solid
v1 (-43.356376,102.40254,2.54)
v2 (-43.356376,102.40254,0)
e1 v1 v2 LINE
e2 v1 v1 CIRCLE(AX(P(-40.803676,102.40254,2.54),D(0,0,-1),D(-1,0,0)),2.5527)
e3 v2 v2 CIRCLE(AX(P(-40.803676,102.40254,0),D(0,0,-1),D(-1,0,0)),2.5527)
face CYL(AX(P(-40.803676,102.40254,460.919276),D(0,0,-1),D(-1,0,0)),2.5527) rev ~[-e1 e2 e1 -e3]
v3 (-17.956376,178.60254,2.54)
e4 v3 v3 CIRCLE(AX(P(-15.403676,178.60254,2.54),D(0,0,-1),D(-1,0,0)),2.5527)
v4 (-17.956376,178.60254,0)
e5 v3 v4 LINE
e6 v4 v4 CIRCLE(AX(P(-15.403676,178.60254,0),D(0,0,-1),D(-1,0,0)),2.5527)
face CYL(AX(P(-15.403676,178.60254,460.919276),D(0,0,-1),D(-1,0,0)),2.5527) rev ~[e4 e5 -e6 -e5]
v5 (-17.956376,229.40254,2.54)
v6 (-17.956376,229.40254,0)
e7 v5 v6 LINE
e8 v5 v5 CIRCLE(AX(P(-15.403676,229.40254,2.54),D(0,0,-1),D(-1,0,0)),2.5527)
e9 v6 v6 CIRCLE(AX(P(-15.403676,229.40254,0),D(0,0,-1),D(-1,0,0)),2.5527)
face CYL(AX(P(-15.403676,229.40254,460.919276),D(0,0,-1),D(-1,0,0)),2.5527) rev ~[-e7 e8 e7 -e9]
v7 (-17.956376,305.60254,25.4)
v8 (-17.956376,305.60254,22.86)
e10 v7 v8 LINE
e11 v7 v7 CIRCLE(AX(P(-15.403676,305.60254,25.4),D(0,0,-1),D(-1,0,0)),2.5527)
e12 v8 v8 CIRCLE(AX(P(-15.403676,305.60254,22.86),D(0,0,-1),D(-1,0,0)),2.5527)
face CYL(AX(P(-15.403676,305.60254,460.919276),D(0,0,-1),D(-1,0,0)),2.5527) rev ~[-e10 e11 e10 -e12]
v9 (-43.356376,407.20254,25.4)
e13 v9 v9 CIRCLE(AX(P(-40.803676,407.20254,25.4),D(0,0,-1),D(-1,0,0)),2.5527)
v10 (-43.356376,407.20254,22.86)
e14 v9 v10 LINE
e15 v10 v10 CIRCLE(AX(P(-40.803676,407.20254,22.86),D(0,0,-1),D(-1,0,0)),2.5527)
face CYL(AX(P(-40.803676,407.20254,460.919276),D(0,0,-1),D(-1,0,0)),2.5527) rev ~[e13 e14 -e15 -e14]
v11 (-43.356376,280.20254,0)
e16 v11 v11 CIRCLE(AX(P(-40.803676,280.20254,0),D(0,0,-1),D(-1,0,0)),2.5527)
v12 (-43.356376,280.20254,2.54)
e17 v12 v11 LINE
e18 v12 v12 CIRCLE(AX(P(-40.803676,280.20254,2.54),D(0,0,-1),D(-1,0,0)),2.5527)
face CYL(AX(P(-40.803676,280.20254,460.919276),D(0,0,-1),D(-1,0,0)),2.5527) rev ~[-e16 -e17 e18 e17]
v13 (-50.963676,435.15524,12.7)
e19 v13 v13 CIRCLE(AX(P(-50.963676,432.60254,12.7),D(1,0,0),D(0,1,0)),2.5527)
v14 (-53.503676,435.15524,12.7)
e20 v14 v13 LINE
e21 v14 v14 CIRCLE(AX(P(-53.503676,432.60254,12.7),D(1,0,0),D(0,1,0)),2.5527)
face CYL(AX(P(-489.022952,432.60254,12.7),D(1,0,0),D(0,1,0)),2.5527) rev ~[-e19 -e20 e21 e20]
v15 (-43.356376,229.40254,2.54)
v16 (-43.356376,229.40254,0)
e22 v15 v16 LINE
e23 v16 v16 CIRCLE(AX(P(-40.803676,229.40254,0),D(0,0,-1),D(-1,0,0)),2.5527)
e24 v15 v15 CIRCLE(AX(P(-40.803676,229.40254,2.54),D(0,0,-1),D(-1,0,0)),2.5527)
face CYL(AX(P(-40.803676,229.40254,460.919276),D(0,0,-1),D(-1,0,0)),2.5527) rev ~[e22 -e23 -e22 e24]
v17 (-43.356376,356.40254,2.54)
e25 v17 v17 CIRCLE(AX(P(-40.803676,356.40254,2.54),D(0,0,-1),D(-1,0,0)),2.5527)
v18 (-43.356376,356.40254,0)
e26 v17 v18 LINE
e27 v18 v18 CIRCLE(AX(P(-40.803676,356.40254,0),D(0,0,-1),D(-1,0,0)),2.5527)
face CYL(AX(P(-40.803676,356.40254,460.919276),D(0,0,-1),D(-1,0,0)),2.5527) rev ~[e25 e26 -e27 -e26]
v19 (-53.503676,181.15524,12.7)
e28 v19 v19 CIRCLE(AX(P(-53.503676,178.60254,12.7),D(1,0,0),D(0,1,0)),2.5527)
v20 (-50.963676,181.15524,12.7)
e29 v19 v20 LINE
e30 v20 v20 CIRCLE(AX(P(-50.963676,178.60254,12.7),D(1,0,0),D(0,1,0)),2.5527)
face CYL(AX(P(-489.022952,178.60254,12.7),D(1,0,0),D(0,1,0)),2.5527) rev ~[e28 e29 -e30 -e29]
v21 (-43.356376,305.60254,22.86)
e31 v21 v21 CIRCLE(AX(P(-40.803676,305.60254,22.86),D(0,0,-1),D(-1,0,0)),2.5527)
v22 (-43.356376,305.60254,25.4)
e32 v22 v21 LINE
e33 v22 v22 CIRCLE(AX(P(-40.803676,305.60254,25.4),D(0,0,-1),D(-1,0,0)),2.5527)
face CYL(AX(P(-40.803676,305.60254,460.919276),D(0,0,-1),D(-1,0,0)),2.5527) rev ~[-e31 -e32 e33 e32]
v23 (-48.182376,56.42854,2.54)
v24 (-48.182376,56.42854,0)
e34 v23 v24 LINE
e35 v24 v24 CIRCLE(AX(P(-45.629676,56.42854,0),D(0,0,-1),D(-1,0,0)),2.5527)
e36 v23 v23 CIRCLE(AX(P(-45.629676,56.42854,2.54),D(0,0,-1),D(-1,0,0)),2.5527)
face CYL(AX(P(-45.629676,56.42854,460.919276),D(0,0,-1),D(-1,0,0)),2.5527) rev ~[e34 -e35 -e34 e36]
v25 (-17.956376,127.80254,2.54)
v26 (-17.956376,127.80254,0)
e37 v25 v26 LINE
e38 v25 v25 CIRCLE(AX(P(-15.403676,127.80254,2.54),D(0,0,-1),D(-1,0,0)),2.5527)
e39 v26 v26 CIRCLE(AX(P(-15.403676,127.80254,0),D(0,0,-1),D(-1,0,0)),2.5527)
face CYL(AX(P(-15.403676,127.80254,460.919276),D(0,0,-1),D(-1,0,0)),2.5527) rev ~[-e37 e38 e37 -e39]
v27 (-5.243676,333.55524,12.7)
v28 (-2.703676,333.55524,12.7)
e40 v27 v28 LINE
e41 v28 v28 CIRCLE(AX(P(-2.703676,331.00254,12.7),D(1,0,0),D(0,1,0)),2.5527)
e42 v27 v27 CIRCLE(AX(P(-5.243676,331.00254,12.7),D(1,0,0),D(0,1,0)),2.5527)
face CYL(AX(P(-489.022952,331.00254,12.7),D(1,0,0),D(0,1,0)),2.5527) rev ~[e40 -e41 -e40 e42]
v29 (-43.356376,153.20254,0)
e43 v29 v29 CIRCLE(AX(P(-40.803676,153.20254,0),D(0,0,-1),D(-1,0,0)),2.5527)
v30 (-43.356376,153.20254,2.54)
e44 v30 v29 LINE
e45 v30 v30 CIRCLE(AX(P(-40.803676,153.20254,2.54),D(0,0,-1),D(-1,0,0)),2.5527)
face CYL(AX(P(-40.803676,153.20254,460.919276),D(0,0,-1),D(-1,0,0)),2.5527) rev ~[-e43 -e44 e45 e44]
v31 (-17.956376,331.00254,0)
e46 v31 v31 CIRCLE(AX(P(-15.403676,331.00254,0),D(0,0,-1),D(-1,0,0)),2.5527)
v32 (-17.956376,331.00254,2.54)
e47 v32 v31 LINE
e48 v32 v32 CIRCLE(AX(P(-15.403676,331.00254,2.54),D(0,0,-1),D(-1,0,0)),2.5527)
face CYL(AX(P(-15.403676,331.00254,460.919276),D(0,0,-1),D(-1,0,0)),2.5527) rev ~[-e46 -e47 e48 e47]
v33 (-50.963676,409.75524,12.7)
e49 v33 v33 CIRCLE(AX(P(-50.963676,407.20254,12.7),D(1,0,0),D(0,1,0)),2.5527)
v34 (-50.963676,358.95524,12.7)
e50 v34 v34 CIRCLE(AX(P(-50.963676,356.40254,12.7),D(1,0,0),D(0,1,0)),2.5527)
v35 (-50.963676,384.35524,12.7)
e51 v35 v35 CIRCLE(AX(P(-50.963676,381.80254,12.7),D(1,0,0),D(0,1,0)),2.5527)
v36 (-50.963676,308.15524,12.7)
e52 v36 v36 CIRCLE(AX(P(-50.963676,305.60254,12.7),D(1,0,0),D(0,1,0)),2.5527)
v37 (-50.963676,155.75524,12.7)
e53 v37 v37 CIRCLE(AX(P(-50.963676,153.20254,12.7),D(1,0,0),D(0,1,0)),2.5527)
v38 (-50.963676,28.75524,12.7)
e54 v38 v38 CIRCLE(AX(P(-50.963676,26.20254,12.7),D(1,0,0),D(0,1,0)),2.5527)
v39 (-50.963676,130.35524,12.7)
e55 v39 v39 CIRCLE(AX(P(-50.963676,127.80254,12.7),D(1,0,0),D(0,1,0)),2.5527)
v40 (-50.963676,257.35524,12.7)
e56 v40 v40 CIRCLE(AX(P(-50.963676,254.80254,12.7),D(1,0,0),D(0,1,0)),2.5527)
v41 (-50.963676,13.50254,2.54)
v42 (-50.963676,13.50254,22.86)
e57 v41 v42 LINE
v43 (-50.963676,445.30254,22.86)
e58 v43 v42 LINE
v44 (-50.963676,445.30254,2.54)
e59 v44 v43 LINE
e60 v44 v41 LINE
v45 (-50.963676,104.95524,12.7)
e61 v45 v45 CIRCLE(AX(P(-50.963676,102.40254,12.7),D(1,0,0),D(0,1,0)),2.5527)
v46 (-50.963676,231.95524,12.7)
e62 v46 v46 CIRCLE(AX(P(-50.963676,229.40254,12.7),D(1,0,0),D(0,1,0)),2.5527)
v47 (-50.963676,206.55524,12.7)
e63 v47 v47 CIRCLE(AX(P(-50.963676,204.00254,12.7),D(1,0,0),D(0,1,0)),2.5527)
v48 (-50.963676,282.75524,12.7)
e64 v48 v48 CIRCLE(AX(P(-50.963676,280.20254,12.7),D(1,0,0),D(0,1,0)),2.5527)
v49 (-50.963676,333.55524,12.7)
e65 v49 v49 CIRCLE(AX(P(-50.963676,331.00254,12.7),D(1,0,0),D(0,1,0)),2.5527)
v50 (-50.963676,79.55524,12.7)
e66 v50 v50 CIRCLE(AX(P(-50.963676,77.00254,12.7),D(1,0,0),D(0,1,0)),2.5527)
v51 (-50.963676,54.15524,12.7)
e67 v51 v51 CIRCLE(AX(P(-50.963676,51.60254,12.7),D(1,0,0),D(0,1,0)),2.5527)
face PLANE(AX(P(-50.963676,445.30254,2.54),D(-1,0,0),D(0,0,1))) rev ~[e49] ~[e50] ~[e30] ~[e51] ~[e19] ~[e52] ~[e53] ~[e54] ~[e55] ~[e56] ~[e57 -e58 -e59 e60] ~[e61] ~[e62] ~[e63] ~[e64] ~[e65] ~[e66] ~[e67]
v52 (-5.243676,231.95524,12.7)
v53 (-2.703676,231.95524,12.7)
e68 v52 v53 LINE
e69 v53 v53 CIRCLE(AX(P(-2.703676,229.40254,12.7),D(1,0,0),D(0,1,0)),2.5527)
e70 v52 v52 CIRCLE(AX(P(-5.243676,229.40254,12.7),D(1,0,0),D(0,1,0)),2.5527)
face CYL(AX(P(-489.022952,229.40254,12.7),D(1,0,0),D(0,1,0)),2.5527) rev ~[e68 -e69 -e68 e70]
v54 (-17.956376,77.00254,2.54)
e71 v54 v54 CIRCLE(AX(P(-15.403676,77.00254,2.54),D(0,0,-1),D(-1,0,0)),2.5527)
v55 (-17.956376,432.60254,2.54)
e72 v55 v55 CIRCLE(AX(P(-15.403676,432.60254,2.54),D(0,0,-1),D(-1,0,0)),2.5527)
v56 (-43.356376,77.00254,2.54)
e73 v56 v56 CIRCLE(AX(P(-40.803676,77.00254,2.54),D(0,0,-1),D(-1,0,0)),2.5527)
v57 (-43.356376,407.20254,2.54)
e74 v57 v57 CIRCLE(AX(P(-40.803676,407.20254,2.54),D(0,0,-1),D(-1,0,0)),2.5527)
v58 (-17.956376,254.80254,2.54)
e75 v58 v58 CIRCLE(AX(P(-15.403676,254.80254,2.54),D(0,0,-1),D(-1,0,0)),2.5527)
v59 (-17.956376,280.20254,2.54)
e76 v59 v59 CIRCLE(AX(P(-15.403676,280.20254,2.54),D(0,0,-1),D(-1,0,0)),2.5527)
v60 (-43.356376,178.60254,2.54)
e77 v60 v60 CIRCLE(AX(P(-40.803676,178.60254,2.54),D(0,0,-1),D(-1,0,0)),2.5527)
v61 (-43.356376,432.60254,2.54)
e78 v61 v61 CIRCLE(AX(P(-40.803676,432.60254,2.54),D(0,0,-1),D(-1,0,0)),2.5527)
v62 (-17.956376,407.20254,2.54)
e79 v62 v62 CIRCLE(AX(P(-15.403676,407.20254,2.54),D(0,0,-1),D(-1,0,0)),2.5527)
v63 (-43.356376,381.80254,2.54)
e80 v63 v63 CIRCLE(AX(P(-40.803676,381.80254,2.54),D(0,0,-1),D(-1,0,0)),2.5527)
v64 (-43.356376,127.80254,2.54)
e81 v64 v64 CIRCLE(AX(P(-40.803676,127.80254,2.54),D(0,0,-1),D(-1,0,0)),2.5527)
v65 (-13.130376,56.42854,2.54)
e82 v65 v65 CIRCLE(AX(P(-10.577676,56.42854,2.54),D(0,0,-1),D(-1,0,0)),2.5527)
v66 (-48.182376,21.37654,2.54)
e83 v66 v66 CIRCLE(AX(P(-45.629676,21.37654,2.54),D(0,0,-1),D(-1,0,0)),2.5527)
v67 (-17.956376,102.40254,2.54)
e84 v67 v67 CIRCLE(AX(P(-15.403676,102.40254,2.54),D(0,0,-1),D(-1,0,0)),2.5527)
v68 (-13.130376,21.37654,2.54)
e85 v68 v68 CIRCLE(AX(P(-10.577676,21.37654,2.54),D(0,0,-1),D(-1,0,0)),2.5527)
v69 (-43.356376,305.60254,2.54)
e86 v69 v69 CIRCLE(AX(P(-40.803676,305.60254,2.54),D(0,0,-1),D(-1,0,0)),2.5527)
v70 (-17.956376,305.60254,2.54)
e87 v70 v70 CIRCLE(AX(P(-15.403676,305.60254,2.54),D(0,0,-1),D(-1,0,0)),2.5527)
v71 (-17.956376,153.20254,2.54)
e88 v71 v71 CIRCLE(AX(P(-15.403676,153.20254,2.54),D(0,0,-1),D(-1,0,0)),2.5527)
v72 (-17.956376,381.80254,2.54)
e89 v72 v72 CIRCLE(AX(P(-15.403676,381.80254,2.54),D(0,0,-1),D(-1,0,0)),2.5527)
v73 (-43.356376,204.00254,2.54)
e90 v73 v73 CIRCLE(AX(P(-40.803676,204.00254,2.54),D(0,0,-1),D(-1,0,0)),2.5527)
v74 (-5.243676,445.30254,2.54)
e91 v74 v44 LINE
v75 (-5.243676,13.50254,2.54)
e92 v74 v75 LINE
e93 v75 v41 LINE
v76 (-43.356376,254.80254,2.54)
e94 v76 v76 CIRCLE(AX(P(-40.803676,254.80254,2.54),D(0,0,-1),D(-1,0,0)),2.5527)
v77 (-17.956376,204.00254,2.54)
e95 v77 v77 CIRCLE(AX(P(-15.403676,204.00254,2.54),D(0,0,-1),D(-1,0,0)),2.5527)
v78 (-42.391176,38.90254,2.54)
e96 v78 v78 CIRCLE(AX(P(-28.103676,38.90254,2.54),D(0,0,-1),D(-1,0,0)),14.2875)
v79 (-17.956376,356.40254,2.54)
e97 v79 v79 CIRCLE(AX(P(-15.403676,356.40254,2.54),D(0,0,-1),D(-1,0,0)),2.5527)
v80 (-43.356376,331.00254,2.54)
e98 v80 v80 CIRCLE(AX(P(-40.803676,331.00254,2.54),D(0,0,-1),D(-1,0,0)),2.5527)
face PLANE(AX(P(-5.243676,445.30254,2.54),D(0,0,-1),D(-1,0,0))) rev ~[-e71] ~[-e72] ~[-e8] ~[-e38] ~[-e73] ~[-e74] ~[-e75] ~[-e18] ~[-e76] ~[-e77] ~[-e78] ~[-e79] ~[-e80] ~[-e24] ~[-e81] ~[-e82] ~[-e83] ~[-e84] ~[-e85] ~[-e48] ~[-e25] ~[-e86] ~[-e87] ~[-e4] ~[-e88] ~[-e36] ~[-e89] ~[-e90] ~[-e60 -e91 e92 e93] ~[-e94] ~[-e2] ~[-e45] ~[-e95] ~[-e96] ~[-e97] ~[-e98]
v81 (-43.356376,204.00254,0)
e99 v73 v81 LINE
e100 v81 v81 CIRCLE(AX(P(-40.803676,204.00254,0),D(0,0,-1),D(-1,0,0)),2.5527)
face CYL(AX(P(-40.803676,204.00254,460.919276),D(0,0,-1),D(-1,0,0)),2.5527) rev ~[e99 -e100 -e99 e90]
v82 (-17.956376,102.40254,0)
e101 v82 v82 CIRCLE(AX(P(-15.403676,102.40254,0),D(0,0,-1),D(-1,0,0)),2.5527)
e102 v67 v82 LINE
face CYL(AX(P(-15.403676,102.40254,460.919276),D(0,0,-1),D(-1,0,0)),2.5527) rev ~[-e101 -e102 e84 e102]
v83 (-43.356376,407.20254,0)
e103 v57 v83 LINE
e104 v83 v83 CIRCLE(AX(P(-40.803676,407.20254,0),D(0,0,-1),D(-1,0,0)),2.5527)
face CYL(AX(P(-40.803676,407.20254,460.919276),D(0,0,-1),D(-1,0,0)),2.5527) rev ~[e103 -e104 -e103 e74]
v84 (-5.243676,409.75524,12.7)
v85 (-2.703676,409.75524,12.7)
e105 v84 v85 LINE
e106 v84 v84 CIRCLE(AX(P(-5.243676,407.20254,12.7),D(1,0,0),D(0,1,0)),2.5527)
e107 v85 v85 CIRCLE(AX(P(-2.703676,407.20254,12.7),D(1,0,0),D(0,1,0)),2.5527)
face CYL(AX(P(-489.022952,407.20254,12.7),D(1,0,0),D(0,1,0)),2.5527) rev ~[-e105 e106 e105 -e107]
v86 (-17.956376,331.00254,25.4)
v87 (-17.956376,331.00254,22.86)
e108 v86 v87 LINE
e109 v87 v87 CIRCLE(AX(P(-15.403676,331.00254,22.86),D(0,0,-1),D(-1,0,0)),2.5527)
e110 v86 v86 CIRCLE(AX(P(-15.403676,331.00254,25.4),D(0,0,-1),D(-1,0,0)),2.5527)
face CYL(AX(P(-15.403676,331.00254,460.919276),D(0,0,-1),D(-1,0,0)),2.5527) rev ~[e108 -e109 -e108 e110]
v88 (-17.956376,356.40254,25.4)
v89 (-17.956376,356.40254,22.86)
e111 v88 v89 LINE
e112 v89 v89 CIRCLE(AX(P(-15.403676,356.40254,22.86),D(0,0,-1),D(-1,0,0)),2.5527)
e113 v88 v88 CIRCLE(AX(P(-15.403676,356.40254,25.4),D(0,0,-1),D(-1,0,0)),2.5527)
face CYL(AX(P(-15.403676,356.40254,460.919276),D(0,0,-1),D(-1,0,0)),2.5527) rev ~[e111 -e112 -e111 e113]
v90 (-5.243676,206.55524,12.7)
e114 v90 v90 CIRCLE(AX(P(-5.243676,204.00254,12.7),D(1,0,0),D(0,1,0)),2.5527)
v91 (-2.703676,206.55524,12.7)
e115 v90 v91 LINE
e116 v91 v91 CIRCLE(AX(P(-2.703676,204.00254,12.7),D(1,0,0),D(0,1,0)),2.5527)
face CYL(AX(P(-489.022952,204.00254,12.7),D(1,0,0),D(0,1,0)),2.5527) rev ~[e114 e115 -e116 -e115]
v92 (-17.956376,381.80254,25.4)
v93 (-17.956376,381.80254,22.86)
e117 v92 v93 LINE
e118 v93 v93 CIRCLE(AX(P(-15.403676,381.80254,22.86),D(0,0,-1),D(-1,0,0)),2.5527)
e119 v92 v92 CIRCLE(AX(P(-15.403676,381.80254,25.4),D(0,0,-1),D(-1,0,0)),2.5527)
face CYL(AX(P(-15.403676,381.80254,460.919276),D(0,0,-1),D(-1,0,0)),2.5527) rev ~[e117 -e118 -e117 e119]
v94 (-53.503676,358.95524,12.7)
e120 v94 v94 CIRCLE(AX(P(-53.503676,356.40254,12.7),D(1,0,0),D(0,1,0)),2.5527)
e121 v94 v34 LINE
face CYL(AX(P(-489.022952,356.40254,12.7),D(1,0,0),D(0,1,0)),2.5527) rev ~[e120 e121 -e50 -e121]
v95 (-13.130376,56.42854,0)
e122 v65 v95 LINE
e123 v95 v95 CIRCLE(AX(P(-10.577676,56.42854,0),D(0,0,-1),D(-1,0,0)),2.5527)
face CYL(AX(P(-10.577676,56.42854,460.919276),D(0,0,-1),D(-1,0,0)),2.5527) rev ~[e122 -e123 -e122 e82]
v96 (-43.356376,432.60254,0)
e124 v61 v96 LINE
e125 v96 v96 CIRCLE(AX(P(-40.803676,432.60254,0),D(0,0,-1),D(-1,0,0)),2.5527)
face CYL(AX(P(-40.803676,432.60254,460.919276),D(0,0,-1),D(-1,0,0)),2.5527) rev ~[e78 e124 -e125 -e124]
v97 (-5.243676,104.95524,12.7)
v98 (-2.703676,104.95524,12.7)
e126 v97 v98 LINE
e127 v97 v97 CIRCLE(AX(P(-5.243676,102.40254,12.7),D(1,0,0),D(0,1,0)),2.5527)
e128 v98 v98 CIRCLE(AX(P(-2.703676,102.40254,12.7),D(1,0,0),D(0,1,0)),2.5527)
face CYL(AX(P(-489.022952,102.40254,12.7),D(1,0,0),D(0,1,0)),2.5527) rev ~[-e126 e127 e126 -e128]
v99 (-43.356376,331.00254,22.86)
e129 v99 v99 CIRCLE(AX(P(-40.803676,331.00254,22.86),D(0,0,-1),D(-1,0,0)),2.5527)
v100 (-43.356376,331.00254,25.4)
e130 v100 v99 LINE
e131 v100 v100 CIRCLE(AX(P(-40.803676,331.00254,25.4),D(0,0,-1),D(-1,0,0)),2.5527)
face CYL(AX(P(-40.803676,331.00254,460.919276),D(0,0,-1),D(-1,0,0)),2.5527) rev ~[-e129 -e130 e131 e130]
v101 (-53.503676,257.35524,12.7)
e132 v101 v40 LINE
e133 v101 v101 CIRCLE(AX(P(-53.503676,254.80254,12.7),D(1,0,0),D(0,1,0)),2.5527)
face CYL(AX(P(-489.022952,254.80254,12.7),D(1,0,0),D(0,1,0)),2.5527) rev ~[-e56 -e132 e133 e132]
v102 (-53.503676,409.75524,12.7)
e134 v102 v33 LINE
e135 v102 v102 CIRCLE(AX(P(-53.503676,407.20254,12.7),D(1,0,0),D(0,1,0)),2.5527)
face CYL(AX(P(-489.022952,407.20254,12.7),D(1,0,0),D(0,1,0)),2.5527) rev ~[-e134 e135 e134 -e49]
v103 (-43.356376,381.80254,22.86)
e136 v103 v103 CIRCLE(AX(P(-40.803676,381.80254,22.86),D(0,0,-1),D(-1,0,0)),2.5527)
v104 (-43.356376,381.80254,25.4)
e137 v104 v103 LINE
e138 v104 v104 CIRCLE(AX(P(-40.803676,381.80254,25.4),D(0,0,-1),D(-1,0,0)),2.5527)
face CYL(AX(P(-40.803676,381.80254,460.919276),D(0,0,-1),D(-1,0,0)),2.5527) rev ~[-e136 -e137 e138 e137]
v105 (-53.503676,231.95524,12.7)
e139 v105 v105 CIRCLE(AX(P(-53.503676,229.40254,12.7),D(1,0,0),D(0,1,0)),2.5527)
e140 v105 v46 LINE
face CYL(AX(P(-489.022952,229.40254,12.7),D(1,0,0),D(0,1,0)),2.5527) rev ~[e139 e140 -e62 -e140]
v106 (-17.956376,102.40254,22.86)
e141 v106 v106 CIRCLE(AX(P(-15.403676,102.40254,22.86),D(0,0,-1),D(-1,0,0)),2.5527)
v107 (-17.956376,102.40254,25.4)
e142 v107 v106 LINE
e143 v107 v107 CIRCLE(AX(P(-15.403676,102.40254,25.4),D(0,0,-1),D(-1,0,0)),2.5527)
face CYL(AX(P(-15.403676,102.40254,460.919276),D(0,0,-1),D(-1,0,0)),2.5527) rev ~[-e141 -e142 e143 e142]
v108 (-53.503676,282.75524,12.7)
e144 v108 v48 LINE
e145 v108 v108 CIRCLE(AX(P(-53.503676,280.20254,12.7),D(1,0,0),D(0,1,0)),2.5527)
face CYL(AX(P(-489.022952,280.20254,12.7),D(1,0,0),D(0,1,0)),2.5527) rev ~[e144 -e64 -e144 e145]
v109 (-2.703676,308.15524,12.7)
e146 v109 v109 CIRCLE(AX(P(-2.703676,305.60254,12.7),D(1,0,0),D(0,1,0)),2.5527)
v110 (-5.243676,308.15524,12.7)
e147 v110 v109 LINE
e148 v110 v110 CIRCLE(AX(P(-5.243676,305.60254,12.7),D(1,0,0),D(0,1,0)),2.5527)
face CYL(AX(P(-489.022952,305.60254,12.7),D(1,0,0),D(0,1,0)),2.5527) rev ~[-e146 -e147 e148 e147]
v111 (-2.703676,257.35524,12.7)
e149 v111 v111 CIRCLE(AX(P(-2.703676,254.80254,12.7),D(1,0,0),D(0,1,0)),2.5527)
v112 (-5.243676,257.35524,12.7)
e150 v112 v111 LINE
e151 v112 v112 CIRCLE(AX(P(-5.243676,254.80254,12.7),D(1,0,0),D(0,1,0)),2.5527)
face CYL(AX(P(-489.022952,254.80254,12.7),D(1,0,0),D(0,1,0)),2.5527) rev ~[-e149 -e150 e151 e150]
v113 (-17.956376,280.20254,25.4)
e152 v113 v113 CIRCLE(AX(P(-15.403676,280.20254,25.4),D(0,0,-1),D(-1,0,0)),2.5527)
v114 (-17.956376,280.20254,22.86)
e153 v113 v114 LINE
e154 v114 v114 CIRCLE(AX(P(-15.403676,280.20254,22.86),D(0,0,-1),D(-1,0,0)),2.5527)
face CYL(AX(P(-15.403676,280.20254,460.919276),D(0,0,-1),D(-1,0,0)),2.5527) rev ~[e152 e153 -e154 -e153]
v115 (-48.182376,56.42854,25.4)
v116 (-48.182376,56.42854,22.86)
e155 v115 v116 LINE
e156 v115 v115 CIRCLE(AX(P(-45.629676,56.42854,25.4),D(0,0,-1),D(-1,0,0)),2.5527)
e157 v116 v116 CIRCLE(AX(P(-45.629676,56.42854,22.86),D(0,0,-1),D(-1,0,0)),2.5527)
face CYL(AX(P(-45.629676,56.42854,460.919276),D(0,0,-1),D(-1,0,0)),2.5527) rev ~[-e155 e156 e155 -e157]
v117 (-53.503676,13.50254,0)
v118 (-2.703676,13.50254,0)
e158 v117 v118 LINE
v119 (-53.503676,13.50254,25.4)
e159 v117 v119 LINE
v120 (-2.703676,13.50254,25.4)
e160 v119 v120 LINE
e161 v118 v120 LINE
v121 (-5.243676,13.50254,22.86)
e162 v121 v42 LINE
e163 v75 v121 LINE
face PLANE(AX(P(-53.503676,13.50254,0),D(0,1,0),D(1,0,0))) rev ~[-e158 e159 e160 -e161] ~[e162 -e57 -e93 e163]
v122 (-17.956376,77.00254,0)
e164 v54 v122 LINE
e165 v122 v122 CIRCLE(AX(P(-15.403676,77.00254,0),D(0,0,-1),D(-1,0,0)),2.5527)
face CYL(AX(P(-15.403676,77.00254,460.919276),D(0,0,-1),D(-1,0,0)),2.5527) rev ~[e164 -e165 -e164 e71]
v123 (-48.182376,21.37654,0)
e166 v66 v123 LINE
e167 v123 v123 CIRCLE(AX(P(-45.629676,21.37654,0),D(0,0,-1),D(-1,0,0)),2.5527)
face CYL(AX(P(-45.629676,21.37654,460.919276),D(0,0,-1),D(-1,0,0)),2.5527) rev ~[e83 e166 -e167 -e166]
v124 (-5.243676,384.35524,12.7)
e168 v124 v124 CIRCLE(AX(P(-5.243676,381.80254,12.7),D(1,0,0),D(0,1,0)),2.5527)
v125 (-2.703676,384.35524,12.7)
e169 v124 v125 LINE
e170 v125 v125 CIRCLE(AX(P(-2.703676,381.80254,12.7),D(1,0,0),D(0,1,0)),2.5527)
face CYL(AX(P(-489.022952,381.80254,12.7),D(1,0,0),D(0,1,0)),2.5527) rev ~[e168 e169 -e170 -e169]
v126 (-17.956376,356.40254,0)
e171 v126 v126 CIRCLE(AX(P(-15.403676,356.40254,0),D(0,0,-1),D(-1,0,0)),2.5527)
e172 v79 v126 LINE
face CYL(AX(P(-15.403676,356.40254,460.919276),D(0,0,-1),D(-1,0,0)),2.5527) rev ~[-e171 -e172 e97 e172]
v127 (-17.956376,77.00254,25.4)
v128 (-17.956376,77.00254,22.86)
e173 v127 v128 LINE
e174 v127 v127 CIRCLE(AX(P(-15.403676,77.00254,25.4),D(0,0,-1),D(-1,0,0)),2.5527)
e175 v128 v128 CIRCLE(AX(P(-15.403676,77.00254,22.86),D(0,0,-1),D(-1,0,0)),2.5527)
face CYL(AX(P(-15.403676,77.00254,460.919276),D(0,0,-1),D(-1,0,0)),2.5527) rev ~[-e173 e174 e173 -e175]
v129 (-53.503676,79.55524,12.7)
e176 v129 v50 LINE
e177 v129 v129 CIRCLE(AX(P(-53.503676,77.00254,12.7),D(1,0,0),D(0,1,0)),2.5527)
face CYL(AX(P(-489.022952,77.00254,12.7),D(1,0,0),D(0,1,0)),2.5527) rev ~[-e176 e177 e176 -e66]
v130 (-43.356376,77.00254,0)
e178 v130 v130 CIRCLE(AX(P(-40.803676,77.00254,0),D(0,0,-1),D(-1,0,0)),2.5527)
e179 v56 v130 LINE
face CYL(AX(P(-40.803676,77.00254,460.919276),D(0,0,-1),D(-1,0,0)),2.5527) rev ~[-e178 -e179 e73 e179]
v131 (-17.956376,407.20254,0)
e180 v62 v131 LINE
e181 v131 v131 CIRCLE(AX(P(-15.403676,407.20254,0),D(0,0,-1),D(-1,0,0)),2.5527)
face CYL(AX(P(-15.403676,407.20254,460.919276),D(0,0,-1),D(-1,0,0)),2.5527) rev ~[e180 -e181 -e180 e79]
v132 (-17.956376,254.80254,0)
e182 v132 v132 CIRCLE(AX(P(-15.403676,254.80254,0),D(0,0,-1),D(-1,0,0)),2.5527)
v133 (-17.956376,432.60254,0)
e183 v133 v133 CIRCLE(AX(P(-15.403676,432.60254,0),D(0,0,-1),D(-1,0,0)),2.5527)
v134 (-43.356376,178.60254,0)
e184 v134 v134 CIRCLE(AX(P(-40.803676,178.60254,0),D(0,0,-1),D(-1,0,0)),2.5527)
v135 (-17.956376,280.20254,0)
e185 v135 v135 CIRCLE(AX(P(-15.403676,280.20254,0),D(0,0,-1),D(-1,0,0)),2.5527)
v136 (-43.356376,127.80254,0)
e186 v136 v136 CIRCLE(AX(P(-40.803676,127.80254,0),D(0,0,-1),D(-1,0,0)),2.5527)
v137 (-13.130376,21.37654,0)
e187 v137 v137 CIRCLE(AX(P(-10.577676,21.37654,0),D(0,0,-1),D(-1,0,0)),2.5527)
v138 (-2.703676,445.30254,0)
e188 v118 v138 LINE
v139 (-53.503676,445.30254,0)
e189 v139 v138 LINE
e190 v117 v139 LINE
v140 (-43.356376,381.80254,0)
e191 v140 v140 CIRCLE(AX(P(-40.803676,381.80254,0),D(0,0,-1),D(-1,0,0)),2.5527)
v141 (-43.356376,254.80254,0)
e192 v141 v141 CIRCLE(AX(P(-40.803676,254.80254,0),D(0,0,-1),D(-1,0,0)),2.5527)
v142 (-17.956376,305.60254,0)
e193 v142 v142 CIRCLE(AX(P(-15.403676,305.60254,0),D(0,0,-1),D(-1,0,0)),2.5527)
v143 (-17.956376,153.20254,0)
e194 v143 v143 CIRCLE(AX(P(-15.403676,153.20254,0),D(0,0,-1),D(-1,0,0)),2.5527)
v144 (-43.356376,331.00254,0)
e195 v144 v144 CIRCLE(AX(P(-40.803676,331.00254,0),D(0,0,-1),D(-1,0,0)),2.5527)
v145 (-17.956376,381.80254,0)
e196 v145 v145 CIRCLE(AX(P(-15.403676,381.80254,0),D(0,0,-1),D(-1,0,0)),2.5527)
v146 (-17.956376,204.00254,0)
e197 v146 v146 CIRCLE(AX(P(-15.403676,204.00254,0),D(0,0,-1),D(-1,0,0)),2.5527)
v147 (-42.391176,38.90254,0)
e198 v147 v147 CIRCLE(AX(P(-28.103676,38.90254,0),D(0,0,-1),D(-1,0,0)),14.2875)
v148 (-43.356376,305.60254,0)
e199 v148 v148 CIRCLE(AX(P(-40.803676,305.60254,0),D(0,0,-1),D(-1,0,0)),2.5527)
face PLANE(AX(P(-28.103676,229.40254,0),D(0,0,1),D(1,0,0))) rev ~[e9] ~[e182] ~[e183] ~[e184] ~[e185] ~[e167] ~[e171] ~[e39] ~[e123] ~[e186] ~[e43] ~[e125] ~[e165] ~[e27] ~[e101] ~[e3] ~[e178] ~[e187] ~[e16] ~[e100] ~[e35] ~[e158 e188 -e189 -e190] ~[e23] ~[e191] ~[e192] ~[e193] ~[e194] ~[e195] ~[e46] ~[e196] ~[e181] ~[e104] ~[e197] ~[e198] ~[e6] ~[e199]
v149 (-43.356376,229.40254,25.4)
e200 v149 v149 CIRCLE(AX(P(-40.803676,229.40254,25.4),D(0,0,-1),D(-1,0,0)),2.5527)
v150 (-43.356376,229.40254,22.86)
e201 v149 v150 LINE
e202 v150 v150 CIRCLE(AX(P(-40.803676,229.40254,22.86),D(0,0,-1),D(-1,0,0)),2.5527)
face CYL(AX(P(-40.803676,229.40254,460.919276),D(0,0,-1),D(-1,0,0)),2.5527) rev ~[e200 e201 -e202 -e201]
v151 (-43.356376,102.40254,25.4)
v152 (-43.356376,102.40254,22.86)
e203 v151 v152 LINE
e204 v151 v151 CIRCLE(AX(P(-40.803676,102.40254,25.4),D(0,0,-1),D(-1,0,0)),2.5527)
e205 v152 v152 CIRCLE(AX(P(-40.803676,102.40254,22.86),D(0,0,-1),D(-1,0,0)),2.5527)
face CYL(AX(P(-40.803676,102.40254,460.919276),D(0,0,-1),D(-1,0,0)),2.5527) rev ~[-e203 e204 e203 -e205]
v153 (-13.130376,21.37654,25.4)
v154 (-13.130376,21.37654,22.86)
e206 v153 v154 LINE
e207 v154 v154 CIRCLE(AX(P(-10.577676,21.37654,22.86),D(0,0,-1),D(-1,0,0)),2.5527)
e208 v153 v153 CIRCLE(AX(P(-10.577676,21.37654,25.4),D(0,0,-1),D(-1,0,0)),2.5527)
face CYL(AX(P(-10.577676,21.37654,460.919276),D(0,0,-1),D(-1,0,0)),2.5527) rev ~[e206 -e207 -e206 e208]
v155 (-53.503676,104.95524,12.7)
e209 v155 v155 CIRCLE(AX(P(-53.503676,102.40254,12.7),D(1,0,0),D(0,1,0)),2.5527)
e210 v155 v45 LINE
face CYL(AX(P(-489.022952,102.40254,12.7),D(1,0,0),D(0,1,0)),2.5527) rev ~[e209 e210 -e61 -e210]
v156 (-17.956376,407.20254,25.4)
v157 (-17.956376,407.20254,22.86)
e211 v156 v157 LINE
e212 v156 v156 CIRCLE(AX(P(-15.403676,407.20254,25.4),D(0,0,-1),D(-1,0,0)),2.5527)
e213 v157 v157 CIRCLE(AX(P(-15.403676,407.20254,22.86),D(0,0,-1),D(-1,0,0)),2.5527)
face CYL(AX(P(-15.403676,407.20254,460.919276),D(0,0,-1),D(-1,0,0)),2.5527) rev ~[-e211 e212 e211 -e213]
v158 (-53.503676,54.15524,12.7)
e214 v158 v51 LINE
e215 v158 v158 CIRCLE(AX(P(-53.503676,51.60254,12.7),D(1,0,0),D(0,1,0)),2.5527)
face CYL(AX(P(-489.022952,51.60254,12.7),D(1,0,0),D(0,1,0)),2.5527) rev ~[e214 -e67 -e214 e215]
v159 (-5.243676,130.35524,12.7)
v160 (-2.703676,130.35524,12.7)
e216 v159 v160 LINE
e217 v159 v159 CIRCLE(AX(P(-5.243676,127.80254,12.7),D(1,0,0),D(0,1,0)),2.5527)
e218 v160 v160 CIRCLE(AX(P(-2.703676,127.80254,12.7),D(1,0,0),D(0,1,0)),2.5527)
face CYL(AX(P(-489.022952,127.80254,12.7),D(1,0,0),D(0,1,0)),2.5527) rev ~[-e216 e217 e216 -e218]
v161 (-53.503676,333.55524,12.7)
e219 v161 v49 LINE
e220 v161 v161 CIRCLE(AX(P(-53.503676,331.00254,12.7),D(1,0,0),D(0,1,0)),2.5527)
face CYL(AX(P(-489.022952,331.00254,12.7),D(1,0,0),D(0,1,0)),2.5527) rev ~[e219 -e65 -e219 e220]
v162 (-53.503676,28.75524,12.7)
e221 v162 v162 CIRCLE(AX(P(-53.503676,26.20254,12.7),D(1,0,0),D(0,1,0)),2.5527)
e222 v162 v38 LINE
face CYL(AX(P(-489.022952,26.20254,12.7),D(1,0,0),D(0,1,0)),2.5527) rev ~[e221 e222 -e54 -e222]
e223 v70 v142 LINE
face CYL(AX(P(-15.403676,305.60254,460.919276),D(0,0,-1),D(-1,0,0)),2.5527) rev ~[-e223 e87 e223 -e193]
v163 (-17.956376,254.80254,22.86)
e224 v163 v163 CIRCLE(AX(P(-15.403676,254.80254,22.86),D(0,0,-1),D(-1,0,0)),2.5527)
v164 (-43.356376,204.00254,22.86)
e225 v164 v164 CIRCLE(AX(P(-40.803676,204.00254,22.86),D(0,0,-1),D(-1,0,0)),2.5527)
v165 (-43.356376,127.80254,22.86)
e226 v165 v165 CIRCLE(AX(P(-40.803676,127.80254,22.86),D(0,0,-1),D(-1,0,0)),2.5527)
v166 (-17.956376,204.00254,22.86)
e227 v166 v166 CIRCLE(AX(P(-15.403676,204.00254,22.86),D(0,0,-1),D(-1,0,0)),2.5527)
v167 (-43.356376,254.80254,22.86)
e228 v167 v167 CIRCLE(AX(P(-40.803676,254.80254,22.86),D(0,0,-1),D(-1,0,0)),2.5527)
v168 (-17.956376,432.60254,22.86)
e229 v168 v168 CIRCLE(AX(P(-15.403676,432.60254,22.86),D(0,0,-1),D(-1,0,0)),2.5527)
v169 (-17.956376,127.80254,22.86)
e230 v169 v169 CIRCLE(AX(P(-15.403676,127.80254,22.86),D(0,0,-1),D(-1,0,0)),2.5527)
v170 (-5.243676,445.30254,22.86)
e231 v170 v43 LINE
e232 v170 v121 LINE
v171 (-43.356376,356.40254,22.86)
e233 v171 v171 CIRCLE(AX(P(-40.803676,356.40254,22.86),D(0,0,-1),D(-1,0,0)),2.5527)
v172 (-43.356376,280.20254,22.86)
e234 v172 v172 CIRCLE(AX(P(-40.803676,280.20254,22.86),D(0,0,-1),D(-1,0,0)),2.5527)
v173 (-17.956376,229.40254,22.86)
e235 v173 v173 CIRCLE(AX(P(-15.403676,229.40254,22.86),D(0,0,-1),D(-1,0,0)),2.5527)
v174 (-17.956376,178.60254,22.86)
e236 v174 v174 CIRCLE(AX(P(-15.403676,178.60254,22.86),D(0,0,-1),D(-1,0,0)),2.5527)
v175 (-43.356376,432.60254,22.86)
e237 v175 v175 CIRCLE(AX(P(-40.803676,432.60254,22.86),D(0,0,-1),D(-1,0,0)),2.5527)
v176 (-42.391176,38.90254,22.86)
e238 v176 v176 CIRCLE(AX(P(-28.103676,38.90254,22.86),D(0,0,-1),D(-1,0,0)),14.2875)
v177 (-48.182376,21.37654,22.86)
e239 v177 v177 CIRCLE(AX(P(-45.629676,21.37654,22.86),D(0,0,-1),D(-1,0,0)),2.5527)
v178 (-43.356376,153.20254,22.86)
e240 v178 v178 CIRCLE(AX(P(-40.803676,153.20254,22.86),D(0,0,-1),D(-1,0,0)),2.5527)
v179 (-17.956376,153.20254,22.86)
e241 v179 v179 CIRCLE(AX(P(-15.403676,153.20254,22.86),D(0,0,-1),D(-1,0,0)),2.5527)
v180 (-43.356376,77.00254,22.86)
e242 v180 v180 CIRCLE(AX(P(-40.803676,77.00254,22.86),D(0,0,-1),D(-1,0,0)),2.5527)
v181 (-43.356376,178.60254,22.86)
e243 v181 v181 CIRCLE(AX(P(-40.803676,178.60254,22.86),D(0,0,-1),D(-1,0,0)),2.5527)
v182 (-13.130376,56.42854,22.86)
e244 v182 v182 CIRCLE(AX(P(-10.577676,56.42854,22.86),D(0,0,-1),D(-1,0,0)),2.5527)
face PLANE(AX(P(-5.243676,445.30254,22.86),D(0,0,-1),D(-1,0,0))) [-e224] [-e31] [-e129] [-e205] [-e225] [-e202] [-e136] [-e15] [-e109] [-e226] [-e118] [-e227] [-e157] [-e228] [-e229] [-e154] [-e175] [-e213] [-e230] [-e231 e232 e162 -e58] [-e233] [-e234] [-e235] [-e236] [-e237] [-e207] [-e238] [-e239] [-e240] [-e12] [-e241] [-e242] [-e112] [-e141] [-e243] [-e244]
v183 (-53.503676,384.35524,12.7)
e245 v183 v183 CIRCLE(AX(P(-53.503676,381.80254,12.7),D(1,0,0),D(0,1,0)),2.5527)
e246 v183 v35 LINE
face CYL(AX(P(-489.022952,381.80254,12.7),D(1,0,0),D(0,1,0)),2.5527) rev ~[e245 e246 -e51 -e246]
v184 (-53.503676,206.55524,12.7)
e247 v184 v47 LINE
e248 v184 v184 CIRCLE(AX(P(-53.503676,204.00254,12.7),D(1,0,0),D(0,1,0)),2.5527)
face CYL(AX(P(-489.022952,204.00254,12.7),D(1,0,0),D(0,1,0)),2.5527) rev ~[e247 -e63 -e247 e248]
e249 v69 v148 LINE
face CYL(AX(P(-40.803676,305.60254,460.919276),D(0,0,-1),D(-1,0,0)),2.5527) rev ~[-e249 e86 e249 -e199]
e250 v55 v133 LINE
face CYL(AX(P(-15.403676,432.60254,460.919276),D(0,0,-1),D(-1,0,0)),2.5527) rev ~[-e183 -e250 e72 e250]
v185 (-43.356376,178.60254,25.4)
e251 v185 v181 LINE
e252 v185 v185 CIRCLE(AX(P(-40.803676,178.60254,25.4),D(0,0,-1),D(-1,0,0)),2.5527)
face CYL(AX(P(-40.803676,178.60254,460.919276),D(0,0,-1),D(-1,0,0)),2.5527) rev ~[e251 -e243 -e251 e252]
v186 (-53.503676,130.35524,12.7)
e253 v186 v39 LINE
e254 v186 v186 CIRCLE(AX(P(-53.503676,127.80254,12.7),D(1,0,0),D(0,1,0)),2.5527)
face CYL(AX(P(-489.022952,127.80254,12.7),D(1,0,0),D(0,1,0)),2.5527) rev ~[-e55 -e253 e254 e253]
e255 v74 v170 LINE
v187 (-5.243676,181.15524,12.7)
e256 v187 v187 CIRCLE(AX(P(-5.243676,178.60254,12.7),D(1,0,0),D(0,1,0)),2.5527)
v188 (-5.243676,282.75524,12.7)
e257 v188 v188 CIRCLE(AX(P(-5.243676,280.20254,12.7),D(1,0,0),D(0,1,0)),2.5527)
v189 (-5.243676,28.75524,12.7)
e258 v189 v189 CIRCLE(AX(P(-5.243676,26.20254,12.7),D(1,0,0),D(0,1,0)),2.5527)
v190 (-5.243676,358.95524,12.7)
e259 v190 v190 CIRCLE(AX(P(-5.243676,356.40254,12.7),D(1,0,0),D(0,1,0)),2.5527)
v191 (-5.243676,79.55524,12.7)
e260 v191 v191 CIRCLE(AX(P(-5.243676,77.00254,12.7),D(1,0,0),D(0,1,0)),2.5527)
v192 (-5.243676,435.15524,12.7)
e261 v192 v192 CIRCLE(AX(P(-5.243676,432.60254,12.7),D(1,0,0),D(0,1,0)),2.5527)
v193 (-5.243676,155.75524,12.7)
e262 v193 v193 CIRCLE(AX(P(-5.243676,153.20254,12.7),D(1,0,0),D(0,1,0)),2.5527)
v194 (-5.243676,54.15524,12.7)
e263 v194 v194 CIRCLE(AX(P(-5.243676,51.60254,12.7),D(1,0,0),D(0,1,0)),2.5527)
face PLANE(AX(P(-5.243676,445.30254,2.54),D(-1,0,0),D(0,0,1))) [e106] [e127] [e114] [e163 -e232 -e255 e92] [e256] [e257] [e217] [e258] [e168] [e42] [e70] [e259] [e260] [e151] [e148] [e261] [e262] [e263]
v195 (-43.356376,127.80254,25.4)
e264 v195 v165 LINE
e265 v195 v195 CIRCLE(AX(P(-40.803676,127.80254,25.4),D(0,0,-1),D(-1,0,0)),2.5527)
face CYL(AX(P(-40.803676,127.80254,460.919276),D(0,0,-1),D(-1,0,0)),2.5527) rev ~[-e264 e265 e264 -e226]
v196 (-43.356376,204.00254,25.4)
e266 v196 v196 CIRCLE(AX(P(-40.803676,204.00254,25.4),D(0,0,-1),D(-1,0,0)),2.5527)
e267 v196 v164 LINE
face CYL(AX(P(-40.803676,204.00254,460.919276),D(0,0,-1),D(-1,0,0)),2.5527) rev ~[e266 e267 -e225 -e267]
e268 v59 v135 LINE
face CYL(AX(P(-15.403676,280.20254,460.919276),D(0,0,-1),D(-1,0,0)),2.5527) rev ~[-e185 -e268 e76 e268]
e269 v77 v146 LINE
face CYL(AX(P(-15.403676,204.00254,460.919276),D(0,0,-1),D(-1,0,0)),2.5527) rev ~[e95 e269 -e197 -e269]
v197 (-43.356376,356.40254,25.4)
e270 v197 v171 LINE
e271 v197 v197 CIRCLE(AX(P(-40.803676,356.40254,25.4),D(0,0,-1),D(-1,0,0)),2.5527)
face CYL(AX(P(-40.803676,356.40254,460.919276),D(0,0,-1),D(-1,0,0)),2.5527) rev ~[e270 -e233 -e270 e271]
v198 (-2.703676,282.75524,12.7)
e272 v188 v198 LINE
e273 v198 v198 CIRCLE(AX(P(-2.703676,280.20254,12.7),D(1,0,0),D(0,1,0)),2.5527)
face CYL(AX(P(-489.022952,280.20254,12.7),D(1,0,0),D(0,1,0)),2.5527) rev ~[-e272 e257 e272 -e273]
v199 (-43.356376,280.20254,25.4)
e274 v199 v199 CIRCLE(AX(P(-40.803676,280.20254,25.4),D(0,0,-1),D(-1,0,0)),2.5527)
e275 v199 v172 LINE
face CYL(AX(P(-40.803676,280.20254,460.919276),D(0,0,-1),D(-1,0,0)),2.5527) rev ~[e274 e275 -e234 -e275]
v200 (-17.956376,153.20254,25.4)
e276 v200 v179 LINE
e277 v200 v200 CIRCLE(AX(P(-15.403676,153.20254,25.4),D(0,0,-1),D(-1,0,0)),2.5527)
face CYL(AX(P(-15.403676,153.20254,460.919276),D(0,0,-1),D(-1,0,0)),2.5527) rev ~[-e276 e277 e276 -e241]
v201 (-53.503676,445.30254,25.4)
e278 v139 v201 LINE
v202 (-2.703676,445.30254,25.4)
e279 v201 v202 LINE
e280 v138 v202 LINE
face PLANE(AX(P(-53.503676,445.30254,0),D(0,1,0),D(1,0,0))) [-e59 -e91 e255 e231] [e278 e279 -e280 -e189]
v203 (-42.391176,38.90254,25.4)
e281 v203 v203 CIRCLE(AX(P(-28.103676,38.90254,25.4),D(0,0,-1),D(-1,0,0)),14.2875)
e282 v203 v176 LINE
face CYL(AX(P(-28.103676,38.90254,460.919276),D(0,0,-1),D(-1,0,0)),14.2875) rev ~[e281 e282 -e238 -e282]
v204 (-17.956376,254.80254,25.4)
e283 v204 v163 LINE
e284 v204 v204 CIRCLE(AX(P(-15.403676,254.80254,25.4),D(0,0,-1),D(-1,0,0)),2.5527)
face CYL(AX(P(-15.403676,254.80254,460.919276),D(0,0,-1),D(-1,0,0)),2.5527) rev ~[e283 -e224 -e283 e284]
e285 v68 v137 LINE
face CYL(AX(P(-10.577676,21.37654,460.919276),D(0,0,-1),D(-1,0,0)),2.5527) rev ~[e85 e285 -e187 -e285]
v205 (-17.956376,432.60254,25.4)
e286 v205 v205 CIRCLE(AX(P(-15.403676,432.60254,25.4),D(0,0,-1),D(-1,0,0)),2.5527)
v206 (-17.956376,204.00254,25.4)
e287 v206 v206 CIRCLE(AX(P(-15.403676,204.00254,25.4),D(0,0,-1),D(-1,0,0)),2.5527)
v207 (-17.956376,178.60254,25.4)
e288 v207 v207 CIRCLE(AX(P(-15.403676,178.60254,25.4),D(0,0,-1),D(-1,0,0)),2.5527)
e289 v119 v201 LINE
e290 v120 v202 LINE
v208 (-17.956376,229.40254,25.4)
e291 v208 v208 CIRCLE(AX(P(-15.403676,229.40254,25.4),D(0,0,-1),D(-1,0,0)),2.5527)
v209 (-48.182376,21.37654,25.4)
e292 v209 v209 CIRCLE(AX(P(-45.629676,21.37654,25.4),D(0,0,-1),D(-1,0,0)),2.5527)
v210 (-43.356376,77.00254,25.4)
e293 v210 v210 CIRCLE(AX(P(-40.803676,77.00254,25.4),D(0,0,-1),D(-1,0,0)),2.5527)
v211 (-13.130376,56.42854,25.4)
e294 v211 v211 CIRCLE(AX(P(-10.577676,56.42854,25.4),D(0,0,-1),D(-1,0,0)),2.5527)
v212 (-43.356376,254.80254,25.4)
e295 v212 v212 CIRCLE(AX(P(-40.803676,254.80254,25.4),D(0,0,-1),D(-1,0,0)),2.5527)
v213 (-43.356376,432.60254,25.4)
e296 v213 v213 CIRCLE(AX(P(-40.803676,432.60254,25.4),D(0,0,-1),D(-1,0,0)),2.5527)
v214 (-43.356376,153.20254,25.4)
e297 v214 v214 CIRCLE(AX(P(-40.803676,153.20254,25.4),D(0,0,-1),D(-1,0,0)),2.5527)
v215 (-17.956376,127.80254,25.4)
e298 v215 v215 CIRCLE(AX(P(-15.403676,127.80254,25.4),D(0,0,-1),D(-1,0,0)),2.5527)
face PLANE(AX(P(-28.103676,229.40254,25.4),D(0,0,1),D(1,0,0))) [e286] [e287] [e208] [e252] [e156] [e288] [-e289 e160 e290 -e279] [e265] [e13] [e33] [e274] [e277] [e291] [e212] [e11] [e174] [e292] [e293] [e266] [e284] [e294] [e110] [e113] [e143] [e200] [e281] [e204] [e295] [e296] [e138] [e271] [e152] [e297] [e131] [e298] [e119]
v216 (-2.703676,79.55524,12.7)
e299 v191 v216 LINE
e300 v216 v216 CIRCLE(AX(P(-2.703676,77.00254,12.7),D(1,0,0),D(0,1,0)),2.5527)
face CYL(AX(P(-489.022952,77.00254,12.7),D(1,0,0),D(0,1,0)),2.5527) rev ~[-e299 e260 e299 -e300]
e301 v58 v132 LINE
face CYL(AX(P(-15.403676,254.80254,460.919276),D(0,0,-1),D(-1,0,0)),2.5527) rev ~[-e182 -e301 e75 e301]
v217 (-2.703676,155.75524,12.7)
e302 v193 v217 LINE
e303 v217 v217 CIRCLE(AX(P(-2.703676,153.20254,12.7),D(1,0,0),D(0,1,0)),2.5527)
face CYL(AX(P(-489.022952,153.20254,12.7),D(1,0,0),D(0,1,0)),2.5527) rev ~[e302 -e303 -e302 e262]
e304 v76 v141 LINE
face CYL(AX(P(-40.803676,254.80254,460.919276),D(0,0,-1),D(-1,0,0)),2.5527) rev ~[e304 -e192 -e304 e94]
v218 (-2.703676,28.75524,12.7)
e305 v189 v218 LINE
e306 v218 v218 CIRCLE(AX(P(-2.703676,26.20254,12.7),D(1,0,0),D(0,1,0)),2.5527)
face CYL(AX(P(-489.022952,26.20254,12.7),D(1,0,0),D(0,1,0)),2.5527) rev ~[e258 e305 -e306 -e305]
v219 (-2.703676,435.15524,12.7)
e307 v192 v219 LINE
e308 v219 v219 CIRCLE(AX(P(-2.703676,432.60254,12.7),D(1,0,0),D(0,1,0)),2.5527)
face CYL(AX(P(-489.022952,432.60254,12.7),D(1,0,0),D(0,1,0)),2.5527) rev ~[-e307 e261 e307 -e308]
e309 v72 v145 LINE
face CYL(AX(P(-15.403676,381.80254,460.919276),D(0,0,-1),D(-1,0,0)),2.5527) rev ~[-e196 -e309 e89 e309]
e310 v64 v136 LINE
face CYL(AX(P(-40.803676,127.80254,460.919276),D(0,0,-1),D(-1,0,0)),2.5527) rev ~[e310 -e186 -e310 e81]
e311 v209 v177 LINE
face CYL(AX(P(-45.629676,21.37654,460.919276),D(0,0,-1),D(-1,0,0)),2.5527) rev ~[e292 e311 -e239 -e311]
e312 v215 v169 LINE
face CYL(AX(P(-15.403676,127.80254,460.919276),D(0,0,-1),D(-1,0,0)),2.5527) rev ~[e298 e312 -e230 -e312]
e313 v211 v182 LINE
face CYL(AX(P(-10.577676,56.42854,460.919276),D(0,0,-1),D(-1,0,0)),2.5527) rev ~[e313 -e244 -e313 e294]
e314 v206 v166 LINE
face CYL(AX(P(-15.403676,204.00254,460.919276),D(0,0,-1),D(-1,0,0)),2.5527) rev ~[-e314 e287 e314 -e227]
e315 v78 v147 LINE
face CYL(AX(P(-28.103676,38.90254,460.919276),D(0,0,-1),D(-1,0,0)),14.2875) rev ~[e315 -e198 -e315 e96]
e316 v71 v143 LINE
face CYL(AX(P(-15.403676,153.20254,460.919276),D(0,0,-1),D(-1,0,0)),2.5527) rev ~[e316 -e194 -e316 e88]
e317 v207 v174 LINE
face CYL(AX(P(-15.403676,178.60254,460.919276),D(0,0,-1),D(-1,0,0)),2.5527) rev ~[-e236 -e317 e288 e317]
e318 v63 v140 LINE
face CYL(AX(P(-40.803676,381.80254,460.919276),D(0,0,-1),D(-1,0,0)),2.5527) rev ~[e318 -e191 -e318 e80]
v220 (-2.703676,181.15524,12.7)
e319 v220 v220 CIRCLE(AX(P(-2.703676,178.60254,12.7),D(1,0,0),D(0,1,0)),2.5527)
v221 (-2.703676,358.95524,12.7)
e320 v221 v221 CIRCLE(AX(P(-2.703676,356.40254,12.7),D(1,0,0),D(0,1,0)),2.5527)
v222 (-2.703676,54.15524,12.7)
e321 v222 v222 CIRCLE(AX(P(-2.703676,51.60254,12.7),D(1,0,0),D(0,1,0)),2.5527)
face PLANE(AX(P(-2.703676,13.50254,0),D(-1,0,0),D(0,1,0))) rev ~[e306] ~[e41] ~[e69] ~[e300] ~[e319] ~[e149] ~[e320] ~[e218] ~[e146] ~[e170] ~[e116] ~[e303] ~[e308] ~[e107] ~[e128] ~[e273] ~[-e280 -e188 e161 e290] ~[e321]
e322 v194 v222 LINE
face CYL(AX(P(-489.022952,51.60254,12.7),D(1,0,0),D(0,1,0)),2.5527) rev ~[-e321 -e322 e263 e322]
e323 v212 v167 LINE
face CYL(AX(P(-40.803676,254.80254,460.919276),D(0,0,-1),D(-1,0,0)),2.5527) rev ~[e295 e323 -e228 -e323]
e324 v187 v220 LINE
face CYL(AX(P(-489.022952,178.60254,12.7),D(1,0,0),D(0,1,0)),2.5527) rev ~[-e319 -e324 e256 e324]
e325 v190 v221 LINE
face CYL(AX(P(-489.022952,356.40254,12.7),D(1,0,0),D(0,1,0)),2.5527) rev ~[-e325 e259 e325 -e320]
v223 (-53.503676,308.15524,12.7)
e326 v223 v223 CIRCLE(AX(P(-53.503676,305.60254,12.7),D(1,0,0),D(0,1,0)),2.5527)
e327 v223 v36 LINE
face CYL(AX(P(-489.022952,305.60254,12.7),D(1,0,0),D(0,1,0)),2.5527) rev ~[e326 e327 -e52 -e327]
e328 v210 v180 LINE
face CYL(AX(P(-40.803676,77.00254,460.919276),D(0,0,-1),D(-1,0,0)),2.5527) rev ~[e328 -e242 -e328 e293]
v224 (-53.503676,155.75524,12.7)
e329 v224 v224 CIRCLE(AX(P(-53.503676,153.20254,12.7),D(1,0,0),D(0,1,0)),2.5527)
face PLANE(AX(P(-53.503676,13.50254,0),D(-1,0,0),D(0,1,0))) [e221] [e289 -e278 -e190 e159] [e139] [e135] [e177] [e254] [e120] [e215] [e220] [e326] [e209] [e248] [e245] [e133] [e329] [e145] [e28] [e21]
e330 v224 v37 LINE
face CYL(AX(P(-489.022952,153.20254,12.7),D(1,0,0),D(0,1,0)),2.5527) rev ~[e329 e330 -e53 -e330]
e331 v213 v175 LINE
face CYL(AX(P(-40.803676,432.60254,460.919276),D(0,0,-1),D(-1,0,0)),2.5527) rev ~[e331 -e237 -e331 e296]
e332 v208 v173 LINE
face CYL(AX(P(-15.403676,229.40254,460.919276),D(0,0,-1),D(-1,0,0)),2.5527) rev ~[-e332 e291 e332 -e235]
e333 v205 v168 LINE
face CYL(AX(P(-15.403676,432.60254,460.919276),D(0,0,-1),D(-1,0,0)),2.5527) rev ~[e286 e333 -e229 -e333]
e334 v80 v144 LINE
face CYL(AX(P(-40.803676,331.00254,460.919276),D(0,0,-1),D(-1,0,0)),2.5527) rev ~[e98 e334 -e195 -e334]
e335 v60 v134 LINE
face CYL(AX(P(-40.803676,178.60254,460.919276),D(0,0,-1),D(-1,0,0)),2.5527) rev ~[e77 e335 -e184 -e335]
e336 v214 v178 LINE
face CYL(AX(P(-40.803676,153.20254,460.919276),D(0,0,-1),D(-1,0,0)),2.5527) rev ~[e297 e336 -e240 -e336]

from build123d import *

# Parameters (mm, degrees)
F0_W     = 50.8
F0_H     = 431.8
F1_DEPTH = 25.4
F4_D     = 5.1054
F6_D     = 5.1054
F8_D     = 5.1054
F2_W     = 45.72
F2_H     = 20.32
F9_DEPTH = 431.8
F10_D    = 28.575


# Not quite as in the source:
# - a feature names something its author has since deleted; it is built from what else it names


with BuildPart() as f1:
    # F0 (on Top) → F1 (new body)
    with BuildSketch(Plane.XY):
        with Locations((-28.1036759261, 229.4025395081)):
            Rectangle(F0_W, F0_H)
    extrude(amount=F1_DEPTH)

    # F4 (through all)
    with Locations(Plane(origin=(-53.5036759261, 0, 0), x_dir=(0, -1, 0), z_dir=(-1, 0, 0))):
        with Locations((-26.2025395081, 12.7), (-331.0025395081, 12.7), (-381.8025395081, 12.7), (-356.4025395081, 12.7), (-407.2025395081, 12.7), (-178.6025395081, 12.7), (-229.4025395081, 12.7), (-204.0025395081, 12.7), (-280.2025395081, 12.7), (-254.8025395081, 12.7), (-305.6025395081, 12.7), (-102.4025395081, 12.7), (-153.2025395081, 12.7), (-51.6025395081, 12.7), (-127.8025395081, 12.7), (-77.0025395081, 12.7), (-432.6025395081, 12.7)):
            Hole(F4_D / 2)

    # F6 (through all)
    with Locations(Plane.XY.offset(25.4)):
        with Locations((-40.8036759261, 432.6025395081), (-15.4036759261, 432.6025395081), (-40.8036759261, 356.4025395081), (-40.8036759261, 381.8025395081), (-40.8036759261, 407.2025395081), (-40.8036759261, 254.8025395081), (-15.4036759261, 356.4025395081), (-15.4036759261, 254.8025395081), (-15.4036759261, 127.8025395081), (-40.8036759261, 102.4025395081), (-15.4036759261, 407.2025395081), (-15.4036759261, 331.0025395081), (-15.4036759261, 305.6025395081), (-40.8036759261, 204.0025395081), (-40.8036759261, 305.6025395081), (-15.4036759261, 280.2025395081), (-40.8036759261, 127.8025395081), (-15.4036759261, 381.8025395081), (-40.8036759261, 77.0025395081), (-40.8036759261, 178.6025395081), (-40.8036759261, 280.2025395081), (-15.4036759261, 77.0025395081), (-15.4036759261, 204.0025395081), (-15.4036759261, 178.6025395081), (-15.4036759261, 229.4025395081), (-15.4036759261, 153.2025395081), (-40.8036759261, 331.0025395081), (-40.8036759261, 229.4025395081), (-15.4036759261, 102.4025395081), (-40.8036759261, 153.2025395081)):
            Hole(F6_D / 2)

    # F8 (through all)
    with Locations(Plane.XY.offset(25.4)):
        with Locations((-45.6296759261, 56.4285395081), (-10.5776759261, 56.4285395081), (-10.5776759261, 21.3765395081), (-45.6296759261, 21.3765395081)):
            Hole(F8_D / 2)

    # F2 (on face) → F9 (cut)
    with BuildSketch(Plane(origin=(0, 445.3025395081, 0), x_dir=(-1, 0, 0), z_dir=(0, 1, 0))):
        with Locations((28.1036759261, 12.7)):
            Rectangle(F2_W, F2_H)
    extrude(amount=-F9_DEPTH, mode=Mode.SUBTRACT)

    # F10 (through all)
    with Locations(Plane.XY.offset(25.4)):
        with Locations((-28.1036759261, 38.9025395081)):
            Hole(F10_D / 2)


solid = f1.part
